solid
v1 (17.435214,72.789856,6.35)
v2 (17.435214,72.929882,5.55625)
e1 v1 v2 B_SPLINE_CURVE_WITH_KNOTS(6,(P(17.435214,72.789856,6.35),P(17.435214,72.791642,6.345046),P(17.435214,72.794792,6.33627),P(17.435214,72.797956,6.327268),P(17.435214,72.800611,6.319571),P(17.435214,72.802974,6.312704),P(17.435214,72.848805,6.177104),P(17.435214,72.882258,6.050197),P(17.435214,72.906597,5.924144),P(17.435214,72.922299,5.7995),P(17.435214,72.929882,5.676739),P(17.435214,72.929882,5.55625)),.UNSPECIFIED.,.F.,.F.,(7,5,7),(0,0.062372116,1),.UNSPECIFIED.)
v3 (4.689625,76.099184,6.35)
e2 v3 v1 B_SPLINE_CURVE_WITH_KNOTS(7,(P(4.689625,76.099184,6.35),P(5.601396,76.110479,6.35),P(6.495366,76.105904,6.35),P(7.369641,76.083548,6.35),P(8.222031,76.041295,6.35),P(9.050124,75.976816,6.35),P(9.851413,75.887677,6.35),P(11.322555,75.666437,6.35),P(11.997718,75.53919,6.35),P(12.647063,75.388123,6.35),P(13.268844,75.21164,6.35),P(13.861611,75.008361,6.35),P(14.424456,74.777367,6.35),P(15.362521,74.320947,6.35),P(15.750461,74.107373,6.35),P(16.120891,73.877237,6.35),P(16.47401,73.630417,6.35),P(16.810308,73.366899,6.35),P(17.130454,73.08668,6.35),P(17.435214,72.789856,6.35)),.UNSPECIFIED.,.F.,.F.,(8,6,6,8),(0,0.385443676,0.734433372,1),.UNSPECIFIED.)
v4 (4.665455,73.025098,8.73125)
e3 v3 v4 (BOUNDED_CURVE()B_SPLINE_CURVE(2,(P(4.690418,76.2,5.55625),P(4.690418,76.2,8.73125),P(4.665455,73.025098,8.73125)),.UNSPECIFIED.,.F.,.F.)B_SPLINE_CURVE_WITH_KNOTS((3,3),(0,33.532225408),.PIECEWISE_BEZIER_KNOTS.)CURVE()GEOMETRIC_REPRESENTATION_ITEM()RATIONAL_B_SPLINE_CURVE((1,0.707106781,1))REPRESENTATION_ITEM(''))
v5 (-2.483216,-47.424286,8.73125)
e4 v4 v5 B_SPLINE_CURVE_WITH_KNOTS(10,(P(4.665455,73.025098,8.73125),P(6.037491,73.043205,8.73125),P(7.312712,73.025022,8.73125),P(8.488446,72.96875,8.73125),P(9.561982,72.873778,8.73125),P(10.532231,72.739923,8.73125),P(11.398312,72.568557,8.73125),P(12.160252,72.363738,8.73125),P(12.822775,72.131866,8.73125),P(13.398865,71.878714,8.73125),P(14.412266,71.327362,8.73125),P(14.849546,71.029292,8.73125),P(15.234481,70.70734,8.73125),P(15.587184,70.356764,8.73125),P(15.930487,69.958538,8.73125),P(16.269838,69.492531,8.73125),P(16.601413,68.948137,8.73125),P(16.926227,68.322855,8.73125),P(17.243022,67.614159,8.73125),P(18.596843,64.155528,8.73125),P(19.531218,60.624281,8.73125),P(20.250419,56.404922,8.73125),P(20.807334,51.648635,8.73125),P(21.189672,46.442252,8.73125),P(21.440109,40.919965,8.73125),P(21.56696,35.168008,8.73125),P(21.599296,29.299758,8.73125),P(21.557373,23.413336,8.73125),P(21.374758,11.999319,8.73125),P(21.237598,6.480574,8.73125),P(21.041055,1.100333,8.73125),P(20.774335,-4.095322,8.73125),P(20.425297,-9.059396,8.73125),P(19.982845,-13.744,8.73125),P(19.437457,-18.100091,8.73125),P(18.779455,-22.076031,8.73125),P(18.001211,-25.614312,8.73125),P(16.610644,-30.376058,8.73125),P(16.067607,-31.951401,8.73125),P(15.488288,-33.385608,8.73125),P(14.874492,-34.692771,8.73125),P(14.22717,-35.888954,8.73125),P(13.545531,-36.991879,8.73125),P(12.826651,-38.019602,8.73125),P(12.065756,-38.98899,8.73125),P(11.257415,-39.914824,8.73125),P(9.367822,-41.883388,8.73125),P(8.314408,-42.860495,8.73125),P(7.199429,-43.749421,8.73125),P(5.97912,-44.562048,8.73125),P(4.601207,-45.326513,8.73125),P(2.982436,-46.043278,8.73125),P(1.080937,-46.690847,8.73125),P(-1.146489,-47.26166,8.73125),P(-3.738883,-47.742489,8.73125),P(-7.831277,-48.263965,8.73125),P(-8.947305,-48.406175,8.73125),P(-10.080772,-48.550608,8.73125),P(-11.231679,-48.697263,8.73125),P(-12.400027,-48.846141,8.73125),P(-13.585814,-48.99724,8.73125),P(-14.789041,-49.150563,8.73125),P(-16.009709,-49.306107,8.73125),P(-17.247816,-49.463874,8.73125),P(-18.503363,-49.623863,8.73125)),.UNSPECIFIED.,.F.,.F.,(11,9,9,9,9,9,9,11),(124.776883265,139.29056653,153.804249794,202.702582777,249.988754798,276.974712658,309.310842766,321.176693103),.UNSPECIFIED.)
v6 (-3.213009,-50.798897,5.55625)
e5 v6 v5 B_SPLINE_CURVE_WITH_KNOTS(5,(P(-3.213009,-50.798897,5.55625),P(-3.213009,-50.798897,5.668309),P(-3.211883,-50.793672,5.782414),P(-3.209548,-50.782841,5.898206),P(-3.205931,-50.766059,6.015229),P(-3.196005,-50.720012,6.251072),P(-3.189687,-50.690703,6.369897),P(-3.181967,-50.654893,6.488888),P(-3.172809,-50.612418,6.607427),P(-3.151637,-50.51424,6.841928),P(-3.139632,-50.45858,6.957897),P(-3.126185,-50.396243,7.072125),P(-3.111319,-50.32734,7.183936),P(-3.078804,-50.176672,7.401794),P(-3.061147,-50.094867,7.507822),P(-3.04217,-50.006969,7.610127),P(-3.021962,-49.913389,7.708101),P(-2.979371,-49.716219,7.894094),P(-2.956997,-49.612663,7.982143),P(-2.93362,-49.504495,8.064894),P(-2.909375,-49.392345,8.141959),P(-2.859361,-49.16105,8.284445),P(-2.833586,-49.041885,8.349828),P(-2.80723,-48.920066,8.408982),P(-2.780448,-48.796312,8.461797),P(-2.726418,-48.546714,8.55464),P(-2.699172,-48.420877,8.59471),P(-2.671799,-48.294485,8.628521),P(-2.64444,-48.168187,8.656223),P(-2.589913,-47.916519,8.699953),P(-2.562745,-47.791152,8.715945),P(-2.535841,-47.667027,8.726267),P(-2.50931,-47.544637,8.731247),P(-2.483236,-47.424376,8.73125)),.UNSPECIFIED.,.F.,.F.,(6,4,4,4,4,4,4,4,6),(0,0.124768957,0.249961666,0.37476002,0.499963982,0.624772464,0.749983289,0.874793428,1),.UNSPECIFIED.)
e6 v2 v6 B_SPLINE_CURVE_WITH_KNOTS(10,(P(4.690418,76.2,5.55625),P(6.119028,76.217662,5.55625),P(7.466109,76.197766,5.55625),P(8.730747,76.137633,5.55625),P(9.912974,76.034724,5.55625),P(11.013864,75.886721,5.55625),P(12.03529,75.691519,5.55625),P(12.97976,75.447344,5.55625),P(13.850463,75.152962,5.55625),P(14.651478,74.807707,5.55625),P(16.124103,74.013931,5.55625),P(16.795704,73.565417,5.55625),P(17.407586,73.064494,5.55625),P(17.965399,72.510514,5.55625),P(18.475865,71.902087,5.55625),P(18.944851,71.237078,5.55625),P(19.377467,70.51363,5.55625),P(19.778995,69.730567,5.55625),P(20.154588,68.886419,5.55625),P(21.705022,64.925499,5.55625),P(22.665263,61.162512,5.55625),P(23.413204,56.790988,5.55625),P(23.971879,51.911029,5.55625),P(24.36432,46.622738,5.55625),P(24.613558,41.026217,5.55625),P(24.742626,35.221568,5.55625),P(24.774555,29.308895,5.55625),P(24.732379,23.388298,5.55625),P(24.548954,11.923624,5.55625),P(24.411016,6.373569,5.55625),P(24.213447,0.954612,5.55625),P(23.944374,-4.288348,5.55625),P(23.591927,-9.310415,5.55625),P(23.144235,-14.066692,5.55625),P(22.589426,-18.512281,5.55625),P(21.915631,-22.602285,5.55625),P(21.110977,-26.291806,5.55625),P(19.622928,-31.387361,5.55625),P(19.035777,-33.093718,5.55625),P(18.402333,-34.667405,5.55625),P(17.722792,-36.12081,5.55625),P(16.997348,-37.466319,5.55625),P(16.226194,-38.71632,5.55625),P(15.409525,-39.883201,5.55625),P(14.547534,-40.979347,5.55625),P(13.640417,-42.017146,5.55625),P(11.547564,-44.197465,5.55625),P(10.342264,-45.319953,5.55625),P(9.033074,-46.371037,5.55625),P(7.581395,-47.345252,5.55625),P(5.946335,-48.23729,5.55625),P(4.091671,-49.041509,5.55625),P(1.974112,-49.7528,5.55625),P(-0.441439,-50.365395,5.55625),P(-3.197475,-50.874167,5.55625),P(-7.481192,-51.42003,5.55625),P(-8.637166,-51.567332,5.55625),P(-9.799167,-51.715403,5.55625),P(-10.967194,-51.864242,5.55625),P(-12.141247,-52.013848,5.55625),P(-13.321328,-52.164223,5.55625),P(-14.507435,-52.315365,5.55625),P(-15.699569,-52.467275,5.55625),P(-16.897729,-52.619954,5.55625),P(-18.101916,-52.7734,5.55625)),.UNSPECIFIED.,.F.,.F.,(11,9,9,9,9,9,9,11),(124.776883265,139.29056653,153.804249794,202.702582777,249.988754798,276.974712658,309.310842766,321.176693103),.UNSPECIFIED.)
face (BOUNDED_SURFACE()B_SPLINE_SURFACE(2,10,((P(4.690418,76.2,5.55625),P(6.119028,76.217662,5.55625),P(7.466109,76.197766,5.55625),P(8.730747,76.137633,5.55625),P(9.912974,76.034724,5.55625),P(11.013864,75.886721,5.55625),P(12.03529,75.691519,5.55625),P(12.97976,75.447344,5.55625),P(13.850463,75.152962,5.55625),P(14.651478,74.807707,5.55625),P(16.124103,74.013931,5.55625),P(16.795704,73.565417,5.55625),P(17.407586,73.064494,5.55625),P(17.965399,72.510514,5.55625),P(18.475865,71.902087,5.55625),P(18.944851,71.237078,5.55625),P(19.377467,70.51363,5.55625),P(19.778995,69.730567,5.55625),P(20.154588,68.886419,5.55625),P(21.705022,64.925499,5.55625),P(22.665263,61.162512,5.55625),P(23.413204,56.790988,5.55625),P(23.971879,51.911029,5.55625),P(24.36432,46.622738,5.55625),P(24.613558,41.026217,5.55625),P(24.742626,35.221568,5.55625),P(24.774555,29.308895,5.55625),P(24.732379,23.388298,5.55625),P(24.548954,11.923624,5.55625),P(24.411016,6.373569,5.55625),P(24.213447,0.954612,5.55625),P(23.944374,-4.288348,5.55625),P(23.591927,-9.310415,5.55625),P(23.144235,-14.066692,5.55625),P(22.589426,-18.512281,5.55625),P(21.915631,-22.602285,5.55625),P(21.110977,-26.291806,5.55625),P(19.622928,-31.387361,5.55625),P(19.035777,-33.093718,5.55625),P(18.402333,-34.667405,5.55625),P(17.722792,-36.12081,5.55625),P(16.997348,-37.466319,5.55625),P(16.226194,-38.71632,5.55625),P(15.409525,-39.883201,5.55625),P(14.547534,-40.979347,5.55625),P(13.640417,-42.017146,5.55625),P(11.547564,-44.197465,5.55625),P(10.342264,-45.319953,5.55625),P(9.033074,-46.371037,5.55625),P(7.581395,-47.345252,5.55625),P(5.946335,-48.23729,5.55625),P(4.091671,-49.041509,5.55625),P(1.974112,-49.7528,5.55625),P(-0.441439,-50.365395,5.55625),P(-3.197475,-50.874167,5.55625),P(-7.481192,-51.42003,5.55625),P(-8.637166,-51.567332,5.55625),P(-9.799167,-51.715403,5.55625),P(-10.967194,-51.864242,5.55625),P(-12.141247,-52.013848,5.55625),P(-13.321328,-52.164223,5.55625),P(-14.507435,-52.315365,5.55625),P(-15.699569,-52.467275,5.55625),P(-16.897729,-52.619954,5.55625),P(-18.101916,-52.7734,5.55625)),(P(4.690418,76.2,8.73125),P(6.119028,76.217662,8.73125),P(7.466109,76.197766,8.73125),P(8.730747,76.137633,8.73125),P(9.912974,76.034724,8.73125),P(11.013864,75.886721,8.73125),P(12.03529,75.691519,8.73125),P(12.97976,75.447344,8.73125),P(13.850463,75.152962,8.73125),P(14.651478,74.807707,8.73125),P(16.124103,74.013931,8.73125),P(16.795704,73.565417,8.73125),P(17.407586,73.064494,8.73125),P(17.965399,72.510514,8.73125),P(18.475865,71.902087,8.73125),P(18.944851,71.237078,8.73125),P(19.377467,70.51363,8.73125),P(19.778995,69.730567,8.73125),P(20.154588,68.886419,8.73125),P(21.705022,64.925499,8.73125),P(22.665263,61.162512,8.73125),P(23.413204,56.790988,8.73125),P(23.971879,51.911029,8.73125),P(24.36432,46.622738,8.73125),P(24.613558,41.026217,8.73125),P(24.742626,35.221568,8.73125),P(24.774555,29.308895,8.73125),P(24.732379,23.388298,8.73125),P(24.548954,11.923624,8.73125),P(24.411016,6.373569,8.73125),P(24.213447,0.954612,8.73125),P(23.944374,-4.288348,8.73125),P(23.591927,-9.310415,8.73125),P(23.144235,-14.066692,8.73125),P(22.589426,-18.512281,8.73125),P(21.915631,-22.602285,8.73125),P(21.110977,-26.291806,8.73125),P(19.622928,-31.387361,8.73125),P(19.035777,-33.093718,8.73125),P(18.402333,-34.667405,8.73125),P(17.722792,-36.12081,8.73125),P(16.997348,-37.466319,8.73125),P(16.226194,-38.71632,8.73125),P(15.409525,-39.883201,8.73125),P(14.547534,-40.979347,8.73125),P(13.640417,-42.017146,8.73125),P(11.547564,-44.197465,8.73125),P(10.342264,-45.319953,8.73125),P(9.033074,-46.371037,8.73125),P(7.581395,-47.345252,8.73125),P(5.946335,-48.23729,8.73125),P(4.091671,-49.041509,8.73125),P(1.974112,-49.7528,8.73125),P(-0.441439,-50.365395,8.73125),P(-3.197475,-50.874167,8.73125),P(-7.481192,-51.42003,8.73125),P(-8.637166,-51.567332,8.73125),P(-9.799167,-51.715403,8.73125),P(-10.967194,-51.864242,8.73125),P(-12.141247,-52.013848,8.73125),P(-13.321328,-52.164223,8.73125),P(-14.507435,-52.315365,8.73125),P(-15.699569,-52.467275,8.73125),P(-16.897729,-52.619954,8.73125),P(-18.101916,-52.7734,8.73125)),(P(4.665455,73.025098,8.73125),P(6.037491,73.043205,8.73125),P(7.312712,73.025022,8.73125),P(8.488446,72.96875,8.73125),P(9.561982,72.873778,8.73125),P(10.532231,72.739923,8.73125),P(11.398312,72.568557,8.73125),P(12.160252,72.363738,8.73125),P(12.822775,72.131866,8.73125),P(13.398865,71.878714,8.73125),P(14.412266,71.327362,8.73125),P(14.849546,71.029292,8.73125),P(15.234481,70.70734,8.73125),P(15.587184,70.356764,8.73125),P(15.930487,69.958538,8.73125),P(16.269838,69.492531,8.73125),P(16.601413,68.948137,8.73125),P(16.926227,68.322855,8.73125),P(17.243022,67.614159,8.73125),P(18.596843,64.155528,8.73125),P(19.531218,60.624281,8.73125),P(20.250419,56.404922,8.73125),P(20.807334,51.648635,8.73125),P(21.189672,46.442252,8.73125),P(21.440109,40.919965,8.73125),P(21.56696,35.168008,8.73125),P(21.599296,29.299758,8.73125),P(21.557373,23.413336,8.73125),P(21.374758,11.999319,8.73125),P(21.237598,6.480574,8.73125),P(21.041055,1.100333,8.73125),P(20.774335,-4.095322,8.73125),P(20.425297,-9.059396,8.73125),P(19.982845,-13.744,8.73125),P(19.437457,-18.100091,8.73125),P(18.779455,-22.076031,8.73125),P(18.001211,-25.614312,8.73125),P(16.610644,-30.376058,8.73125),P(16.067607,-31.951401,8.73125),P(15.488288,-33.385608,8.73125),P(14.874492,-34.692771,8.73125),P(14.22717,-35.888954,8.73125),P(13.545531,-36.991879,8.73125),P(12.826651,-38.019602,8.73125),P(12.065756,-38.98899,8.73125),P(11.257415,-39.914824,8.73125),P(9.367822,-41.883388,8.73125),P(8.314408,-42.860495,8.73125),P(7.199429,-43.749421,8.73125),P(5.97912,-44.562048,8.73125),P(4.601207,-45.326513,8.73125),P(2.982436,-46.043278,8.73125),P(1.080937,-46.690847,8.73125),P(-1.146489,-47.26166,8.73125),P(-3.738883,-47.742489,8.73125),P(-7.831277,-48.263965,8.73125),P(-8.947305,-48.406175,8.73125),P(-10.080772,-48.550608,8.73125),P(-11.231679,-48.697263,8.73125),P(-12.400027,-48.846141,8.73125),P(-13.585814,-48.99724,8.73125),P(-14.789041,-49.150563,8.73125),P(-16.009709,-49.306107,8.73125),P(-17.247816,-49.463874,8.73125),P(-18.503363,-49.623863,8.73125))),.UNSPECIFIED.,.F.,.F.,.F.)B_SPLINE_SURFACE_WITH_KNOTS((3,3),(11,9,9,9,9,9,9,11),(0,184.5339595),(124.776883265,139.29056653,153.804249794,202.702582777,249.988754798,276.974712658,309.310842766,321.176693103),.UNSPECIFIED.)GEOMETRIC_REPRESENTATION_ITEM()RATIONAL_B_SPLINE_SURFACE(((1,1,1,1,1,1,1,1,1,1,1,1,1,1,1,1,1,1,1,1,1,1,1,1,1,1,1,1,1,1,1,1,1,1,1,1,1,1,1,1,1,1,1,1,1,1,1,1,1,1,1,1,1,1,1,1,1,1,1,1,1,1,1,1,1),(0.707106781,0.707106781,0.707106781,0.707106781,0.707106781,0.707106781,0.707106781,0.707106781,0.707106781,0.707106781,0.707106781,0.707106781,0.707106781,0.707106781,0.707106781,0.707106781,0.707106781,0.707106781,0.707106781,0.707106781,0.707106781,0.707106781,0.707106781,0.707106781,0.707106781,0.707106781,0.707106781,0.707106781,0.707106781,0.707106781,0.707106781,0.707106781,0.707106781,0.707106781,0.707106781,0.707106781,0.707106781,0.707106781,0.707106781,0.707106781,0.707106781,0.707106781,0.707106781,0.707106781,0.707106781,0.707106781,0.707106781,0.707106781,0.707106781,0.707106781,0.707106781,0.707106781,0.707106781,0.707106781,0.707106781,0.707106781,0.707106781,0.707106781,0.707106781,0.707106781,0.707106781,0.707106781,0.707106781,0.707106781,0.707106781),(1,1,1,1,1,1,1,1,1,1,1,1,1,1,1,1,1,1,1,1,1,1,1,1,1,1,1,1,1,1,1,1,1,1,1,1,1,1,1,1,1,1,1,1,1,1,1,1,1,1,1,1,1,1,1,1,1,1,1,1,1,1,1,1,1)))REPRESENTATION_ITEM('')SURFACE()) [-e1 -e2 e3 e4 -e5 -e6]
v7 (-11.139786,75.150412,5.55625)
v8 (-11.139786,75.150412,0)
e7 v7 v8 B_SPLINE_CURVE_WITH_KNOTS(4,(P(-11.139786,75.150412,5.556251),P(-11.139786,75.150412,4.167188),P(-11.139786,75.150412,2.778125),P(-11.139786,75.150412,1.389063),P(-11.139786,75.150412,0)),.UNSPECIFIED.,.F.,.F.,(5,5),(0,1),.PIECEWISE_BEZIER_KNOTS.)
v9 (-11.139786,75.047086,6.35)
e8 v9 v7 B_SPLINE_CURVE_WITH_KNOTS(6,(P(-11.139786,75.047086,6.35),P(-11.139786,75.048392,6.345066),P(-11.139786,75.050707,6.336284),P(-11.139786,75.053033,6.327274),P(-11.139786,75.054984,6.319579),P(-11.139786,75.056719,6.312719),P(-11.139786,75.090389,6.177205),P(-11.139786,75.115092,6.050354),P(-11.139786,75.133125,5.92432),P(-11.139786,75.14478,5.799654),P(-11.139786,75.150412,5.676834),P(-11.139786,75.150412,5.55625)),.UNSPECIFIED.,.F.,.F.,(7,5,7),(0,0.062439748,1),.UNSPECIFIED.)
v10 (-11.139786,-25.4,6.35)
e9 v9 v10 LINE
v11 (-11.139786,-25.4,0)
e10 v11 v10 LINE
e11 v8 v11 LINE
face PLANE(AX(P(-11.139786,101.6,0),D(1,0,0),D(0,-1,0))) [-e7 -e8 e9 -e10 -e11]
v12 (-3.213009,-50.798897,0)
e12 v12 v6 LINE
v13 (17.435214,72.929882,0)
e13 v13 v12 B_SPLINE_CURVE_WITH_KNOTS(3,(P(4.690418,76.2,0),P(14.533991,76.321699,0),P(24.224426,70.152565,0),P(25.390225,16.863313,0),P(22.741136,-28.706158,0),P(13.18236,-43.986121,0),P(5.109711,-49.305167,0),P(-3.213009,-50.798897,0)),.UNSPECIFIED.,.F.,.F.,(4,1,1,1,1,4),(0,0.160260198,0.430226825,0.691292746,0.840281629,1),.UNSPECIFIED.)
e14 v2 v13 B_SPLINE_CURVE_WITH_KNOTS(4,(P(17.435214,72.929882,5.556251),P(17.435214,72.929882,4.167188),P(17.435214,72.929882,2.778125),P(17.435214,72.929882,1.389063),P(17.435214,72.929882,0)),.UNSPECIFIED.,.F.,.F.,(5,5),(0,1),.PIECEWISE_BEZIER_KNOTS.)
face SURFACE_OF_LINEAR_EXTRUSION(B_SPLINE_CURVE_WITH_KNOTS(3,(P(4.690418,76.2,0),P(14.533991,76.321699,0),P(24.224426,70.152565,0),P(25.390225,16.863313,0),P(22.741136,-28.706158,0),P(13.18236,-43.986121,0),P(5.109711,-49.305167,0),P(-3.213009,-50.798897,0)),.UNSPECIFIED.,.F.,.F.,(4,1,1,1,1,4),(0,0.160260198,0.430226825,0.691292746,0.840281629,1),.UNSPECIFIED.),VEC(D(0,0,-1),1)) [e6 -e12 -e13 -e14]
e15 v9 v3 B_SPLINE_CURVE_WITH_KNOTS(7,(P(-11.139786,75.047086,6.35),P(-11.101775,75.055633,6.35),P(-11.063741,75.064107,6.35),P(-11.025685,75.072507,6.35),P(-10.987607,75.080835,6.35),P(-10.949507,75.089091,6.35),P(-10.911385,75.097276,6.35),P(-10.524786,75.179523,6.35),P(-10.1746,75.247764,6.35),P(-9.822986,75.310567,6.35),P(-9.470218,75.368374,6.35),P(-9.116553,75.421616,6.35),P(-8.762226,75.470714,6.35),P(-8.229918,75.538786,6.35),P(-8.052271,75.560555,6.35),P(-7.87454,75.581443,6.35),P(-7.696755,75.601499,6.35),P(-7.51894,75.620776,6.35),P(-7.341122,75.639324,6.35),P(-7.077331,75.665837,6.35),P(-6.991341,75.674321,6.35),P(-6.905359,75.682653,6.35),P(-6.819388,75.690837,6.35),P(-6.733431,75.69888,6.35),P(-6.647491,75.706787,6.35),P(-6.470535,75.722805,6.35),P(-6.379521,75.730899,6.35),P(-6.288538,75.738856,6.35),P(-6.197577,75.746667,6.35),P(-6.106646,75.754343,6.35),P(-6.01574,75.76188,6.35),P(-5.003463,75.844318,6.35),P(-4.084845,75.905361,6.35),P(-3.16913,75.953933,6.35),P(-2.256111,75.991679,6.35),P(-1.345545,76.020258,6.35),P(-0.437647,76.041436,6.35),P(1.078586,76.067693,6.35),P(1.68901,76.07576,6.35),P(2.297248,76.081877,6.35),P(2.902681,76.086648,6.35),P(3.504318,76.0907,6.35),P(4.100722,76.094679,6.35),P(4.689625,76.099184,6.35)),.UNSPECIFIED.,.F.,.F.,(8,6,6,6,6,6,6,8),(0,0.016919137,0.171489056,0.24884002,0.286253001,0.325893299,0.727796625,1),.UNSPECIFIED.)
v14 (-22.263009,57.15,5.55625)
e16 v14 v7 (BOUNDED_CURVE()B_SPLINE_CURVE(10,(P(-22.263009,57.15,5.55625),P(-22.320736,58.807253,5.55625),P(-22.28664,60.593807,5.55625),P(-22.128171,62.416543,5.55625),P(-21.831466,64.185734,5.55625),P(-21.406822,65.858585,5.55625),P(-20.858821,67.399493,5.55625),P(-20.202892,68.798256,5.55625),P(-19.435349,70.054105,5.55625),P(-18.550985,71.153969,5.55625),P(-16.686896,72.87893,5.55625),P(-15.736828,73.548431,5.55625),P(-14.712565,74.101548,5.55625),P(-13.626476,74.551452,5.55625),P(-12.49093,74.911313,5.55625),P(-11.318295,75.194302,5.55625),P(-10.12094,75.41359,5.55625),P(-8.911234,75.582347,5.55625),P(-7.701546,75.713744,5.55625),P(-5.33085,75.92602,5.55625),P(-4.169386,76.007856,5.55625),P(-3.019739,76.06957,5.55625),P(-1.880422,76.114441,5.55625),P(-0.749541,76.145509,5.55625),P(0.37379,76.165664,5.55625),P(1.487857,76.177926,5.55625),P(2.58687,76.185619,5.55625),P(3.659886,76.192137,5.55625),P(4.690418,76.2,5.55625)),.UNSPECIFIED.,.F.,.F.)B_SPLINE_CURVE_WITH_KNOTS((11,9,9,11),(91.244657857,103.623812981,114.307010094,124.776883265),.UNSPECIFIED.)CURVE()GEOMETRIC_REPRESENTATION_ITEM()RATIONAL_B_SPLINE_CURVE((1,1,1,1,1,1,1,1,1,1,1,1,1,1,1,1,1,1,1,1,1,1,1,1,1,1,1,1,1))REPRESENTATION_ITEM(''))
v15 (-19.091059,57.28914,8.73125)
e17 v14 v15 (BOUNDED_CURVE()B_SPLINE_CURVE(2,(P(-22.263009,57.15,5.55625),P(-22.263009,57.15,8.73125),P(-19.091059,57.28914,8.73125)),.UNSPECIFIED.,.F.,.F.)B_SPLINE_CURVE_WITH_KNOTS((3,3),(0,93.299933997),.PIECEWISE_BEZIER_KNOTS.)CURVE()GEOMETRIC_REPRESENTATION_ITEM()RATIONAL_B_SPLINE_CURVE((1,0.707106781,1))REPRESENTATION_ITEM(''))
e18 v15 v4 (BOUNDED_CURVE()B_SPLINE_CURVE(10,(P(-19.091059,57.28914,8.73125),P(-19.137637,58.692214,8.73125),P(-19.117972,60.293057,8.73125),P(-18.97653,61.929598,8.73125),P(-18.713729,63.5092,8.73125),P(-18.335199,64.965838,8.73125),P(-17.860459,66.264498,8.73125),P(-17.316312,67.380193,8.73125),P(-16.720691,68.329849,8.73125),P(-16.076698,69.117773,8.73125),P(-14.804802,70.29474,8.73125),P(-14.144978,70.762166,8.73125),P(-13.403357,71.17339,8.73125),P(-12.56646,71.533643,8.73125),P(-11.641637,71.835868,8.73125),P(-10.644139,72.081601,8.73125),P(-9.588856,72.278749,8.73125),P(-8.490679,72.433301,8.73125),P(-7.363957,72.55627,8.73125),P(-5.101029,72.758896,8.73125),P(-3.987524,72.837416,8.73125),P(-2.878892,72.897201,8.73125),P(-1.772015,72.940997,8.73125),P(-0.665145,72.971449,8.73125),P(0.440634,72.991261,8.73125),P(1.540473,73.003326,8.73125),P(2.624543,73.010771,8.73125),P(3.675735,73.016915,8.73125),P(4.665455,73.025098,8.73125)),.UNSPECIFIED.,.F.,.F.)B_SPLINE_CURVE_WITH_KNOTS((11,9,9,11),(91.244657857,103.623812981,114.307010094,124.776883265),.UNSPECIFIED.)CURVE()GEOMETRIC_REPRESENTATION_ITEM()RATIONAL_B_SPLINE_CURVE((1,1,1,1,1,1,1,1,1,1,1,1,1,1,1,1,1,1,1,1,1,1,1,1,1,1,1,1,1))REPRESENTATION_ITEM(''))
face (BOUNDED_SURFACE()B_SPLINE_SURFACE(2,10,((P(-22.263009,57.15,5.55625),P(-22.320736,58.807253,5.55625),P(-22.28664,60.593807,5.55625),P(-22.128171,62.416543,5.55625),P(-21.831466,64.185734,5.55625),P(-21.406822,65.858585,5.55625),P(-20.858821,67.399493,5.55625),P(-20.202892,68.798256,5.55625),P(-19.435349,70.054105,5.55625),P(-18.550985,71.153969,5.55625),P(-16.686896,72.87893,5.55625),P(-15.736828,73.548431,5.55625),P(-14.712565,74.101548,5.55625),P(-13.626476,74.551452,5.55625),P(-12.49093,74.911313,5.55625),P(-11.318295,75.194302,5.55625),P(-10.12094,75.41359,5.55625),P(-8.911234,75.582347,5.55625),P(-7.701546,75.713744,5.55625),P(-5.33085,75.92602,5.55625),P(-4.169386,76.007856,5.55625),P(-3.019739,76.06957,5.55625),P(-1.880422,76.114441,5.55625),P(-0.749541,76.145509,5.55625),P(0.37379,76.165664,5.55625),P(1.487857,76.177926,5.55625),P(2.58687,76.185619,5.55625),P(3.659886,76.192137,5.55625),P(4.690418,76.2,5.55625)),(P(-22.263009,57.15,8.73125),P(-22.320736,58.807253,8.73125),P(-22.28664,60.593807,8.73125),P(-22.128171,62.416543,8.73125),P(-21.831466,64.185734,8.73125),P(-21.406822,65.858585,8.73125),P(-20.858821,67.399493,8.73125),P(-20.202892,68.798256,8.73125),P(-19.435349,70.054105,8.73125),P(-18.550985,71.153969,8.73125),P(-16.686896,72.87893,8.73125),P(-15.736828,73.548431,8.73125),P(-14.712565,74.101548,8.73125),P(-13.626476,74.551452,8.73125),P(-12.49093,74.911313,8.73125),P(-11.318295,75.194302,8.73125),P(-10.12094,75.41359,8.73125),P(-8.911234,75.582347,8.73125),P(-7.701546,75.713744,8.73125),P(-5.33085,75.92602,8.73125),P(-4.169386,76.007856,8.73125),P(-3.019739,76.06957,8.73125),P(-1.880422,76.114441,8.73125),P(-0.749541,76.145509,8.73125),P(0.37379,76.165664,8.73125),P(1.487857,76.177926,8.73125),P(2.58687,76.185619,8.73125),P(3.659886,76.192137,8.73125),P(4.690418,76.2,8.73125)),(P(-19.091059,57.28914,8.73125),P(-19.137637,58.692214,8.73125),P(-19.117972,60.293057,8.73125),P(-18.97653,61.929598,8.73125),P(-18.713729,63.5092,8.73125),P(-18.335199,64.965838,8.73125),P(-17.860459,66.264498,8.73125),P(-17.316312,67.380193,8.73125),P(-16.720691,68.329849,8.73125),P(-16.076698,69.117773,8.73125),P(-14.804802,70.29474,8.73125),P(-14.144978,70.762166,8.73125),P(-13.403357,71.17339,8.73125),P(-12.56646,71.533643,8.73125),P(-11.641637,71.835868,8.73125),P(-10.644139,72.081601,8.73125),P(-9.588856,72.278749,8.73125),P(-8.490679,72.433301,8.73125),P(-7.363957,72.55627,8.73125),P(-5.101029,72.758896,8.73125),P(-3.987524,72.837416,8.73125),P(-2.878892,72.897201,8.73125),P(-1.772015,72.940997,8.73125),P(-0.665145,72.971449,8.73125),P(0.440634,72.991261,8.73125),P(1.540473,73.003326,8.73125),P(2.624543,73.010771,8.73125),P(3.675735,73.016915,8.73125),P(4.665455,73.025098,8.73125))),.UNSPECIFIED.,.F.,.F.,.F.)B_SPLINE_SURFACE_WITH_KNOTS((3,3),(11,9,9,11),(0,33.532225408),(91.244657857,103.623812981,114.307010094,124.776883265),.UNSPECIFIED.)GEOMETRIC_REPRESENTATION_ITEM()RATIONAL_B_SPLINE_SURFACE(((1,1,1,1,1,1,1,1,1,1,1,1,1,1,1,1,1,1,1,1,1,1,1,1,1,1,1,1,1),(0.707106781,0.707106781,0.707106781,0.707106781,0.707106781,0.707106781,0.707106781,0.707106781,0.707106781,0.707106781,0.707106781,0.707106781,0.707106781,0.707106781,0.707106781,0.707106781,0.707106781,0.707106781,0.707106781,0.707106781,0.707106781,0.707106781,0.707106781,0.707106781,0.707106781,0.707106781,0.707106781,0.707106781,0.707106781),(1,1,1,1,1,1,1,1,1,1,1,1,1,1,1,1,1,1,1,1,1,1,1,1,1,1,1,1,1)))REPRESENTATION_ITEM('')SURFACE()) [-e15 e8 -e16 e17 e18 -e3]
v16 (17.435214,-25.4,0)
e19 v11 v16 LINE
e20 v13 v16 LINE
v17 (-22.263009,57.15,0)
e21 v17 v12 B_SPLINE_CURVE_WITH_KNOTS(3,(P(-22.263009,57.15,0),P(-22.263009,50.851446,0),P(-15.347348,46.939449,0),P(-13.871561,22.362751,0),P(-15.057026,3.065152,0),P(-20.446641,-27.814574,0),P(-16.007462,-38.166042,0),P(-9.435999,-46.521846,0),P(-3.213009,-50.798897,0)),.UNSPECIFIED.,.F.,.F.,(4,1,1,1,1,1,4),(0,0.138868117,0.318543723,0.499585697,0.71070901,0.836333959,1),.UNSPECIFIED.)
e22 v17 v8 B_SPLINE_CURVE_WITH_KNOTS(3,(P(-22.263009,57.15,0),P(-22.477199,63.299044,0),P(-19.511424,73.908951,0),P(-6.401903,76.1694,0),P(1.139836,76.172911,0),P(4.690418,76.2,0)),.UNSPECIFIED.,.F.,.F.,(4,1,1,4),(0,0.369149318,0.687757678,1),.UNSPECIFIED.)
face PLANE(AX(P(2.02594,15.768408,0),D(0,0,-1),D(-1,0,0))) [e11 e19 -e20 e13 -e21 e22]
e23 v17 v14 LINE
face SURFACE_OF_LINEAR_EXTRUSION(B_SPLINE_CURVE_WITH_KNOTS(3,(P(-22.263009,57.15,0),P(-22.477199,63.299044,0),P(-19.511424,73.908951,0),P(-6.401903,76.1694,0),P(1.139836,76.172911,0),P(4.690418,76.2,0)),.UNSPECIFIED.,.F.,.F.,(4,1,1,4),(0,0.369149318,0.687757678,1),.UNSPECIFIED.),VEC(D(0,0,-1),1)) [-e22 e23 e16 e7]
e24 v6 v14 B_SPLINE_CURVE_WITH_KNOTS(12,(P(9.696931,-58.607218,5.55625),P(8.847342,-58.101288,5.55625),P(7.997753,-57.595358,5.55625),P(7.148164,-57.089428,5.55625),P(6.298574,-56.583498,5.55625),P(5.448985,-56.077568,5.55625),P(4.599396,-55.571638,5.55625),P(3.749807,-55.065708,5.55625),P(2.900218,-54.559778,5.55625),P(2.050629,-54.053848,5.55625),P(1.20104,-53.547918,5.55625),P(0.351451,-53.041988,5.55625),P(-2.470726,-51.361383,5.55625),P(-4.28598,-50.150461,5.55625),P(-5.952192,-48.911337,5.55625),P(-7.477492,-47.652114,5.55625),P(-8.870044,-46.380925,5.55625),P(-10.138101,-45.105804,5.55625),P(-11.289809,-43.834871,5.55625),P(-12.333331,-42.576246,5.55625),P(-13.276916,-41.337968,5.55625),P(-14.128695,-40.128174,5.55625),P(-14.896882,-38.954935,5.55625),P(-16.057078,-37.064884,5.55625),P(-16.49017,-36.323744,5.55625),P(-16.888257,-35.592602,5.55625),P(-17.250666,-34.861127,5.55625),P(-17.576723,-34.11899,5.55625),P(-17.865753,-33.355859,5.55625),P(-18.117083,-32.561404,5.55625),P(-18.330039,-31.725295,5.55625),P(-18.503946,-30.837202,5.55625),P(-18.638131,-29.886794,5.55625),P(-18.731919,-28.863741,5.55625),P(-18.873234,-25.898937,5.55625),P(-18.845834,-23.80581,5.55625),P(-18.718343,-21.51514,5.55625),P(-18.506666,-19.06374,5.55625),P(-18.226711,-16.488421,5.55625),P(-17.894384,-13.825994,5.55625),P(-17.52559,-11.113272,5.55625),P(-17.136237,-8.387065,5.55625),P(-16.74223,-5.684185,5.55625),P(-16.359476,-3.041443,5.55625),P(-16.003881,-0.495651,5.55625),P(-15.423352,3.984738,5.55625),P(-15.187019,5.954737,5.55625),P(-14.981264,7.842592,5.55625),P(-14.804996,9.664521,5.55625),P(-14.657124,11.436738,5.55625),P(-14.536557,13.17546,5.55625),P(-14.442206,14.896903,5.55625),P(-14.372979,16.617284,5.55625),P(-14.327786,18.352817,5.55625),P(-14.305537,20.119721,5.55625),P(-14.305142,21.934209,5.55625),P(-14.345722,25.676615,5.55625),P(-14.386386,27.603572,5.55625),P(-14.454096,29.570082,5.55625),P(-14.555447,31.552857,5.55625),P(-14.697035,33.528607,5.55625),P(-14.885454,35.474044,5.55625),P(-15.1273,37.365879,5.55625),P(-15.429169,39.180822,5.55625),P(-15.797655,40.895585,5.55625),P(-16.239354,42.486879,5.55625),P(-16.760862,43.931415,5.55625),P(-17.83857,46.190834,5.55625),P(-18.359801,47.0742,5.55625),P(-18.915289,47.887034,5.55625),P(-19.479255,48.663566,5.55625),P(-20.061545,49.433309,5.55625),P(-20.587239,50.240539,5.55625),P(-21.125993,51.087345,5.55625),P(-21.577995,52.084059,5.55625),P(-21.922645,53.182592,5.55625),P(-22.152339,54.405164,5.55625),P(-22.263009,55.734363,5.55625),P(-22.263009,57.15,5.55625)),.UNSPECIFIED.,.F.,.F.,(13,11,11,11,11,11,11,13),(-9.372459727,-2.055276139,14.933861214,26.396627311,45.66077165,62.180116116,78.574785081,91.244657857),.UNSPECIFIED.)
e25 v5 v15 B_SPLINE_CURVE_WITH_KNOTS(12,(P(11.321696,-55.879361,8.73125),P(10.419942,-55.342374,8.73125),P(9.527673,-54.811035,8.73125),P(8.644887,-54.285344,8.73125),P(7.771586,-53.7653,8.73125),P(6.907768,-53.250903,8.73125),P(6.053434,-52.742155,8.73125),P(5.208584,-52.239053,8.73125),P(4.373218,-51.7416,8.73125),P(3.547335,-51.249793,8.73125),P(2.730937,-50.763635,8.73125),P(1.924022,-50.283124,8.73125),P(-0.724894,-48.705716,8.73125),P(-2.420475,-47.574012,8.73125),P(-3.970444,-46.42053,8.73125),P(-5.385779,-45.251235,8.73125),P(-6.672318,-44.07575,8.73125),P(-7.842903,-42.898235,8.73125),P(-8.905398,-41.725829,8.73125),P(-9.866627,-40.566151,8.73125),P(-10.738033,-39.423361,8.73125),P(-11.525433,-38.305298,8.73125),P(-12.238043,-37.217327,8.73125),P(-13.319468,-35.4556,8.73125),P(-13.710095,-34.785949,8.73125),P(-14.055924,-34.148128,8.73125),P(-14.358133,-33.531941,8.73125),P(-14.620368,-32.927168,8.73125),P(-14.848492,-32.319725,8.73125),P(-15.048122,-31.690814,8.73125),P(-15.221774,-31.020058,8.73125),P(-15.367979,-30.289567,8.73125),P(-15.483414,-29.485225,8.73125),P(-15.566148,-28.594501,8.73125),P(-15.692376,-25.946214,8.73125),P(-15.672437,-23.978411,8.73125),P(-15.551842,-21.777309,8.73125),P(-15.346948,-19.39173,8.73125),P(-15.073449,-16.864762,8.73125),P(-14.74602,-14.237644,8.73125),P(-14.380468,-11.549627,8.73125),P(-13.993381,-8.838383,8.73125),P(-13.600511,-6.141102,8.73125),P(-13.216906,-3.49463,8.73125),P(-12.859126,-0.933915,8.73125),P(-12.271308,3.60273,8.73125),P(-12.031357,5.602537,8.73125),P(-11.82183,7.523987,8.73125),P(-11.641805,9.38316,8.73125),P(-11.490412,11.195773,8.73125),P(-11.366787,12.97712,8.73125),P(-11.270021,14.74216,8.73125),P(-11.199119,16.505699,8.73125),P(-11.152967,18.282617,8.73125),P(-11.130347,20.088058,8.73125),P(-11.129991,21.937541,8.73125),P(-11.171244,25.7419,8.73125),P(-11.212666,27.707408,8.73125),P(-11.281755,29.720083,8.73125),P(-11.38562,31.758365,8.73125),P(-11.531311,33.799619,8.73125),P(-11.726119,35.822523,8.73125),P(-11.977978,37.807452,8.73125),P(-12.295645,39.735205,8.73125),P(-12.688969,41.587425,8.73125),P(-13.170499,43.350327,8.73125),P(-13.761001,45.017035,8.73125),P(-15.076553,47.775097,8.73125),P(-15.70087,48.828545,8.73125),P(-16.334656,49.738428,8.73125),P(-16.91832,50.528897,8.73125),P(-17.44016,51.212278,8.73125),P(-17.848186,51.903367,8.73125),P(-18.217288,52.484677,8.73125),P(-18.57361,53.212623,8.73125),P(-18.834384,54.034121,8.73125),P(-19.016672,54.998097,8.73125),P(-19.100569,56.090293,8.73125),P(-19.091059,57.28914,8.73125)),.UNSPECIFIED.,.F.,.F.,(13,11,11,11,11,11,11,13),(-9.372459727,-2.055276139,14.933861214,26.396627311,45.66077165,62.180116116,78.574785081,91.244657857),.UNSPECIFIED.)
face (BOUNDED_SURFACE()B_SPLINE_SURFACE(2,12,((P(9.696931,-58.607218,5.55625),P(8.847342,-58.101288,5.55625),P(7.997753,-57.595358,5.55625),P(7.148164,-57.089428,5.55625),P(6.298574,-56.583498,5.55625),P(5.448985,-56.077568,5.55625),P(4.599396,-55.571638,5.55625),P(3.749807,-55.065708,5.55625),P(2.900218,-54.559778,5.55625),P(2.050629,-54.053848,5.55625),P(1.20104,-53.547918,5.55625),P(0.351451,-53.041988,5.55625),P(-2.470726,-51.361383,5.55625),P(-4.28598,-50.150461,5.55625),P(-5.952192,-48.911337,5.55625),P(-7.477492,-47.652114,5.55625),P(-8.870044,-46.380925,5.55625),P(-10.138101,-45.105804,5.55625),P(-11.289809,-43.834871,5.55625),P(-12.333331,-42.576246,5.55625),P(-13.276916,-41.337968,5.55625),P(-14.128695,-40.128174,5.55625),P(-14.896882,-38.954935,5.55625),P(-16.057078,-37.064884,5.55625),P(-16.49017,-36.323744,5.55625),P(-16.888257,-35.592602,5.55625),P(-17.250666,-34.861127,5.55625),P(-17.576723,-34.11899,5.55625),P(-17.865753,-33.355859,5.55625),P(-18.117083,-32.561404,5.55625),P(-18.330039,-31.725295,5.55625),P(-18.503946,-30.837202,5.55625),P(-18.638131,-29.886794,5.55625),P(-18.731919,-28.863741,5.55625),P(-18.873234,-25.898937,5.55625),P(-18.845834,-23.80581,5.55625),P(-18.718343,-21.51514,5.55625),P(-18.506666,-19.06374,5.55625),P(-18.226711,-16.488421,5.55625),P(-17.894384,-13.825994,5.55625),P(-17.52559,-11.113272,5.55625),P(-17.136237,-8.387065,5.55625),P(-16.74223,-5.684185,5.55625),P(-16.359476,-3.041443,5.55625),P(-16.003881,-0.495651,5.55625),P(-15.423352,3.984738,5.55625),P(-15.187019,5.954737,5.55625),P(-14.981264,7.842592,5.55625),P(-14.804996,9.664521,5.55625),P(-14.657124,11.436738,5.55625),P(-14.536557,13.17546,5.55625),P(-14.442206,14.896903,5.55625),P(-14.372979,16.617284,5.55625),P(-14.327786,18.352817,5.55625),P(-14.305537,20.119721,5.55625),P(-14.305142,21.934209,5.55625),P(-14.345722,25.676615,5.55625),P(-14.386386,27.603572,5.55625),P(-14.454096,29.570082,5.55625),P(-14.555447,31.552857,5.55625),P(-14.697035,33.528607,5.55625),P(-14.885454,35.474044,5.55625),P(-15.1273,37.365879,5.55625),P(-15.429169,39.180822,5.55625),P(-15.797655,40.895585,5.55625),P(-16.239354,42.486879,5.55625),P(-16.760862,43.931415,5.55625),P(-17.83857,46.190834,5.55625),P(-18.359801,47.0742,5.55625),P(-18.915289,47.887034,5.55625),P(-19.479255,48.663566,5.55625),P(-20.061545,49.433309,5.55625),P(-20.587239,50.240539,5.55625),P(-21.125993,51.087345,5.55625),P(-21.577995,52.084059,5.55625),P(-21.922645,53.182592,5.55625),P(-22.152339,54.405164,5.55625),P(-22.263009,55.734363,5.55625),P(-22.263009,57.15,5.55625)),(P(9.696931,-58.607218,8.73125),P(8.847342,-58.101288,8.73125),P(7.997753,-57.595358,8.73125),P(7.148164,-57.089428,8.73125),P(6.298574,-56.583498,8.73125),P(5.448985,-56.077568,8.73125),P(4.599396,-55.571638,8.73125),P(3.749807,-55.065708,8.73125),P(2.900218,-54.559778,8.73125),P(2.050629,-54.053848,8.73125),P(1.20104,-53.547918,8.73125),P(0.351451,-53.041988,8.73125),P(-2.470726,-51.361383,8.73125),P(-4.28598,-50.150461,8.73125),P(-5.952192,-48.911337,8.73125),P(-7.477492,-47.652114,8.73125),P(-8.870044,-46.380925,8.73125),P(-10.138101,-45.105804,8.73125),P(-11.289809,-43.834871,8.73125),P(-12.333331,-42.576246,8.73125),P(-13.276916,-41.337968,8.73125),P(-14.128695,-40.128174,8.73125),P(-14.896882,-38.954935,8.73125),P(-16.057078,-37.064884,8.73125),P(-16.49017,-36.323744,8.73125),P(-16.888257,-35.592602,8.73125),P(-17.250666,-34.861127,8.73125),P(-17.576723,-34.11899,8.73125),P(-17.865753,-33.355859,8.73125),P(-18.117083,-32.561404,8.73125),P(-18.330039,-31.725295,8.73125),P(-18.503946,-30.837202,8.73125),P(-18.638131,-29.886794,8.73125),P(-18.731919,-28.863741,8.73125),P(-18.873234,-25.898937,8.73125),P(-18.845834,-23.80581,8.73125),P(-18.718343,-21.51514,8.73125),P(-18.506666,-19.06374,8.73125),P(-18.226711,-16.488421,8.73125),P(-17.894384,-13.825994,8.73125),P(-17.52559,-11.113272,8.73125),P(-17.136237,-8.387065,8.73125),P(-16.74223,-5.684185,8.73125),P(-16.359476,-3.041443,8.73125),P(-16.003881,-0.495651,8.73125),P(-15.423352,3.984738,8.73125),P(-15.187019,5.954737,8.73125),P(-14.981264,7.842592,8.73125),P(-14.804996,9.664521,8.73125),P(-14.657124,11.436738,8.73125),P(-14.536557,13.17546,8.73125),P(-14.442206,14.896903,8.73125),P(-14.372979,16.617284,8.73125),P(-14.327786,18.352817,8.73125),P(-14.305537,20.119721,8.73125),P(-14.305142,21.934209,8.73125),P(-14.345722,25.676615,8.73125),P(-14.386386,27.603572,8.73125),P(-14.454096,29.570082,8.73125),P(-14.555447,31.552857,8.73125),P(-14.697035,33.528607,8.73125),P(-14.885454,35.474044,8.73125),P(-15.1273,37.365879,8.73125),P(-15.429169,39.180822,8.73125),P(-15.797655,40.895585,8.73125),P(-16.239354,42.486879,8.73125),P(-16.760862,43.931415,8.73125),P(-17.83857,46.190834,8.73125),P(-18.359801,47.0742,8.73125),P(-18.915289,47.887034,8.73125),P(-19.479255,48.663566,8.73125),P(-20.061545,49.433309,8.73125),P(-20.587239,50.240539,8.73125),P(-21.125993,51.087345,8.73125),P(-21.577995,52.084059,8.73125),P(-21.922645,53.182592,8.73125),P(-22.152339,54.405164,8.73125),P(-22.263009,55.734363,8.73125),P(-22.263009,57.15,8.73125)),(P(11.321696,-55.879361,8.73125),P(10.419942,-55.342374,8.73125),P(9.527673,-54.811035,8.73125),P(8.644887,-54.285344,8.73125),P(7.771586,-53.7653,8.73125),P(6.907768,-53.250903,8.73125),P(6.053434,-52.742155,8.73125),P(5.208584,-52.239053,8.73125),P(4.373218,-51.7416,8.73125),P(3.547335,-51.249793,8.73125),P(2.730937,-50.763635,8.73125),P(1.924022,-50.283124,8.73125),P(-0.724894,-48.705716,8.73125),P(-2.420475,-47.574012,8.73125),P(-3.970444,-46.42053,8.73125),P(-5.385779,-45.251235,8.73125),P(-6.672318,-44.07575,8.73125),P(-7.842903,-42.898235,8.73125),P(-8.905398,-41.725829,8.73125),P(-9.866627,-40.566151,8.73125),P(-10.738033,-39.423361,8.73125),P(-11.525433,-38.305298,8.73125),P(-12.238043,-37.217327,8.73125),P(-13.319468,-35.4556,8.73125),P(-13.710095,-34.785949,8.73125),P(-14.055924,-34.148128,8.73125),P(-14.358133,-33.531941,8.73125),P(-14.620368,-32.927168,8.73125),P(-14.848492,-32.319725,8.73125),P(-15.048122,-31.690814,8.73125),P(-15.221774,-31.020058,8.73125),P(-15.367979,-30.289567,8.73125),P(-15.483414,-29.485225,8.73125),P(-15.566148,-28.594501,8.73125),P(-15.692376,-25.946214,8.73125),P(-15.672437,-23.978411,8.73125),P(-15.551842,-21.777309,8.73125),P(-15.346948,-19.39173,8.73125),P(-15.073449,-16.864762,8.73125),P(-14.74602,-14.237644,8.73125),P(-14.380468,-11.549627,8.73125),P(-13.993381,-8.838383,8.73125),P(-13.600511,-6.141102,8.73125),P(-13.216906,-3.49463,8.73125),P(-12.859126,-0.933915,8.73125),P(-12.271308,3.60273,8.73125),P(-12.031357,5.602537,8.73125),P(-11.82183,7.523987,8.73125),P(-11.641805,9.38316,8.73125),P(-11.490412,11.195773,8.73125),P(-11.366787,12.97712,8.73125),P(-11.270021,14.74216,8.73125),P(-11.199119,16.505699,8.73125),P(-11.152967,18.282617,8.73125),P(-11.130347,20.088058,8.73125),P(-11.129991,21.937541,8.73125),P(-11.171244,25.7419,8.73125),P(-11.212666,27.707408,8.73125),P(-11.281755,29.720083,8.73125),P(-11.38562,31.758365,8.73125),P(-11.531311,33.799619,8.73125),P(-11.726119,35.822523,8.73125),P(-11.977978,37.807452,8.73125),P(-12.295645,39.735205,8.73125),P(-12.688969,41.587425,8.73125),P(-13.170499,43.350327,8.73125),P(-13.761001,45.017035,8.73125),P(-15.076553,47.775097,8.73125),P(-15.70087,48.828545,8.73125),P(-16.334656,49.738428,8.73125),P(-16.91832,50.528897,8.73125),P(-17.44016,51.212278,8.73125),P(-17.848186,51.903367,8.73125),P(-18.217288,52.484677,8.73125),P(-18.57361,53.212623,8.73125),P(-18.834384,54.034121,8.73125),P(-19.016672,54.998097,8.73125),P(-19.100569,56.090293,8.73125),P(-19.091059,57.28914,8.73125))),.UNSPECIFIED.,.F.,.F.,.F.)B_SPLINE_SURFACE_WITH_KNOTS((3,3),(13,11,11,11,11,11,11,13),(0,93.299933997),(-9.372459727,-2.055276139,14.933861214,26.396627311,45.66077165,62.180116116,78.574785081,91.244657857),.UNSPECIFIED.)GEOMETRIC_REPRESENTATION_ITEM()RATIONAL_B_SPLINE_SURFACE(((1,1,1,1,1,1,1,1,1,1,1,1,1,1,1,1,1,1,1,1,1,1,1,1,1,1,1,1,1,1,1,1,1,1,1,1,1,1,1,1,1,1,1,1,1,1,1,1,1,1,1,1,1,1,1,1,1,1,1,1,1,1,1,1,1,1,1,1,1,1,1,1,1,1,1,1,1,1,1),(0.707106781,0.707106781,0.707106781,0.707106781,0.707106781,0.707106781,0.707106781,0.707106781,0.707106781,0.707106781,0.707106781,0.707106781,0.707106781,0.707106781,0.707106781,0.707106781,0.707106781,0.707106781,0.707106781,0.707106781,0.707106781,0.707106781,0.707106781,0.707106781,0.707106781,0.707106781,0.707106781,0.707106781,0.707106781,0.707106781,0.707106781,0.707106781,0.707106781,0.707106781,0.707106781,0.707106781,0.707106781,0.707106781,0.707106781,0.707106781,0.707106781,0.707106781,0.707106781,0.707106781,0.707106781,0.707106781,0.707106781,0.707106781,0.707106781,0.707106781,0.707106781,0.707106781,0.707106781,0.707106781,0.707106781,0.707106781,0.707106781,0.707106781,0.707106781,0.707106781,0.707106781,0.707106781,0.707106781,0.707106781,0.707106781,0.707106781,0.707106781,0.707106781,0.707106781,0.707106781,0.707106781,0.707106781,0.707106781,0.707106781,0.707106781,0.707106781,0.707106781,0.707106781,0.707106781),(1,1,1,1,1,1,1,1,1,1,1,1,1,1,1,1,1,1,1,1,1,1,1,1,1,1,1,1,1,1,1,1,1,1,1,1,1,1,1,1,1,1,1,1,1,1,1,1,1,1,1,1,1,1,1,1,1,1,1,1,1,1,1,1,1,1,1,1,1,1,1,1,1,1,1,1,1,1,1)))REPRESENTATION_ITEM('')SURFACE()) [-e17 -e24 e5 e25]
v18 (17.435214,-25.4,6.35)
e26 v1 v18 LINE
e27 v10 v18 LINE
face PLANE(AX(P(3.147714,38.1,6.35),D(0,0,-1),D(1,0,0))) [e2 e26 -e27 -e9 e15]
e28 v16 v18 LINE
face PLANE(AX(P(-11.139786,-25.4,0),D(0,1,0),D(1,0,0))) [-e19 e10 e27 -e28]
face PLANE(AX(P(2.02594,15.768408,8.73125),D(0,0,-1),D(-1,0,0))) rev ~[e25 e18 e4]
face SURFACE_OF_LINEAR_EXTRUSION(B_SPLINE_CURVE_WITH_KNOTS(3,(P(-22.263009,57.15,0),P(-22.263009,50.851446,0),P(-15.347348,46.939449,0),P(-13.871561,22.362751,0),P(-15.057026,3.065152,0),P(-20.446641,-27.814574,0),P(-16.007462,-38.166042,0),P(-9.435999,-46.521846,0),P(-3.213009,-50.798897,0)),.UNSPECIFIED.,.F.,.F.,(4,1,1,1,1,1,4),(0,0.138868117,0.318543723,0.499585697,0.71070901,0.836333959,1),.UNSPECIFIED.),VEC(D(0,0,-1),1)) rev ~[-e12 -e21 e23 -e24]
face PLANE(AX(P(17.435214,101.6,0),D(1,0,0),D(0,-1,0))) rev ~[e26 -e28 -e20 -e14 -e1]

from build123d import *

# Parameters (mm, degrees)
F1_DEPTH = 8.73125
F2_R     = 3.175
F3_W     = 28.575
F3_H     = 127
F4_DEPTH = 6.35


with BuildPart() as f1:
    # F0 (on Top) → F1 (new body)
    with BuildSketch(Plane.XY):
        with BuildLine():
            add(Edge.make_bspline(
                [(-22.2630089622, 57.15), (-22.4771988152, 63.2990440352), (-19.5114240111, 73.9089506041), (-6.4019025255, 76.1693999245), (1.1398358038, 76.1729106307), (4.6904176342, 76.2)],
                knots=[0, 0, 0, 0, 0.3691493182, 0.6877576776, 1, 1, 1, 1], degree=3))
            add(Edge.make_bspline(
                [(-22.2630089622, 57.15), (-22.2630089622, 50.8514460964), (-15.3473480842, 46.9394491864), (-13.8715606343, 22.3627512215), (-15.0570255507, 3.0651518011), (-20.4466410587, -27.8145738651), (-16.0074621044, -38.1660419017), (-9.4359992072, -46.521846205), (-3.2130089622, -50.7988970175)],
                knots=[0, 0, 0, 0, 0.138868117, 0.3185437234, 0.4995856975, 0.7107090098, 0.8363339586, 1, 1, 1, 1], degree=3))
            add(Edge.make_bspline(
                [(4.6904176342, 76.2), (14.5339909941, 76.3216987252), (24.2244258774, 70.1525650219), (25.3902250152, 16.8633127605), (22.7411357456, -28.7061581774), (13.1823598211, -43.9861209726), (5.1097106189, -49.3051670492), (-3.2130089622, -50.7988970175)],
                knots=[0, 0, 0, 0, 0.1602601979, 0.4302268246, 0.6912927459, 0.8402816289, 1, 1, 1, 1], degree=3))
        make_face()
    extrude(amount=F1_DEPTH)

    # F2
    f2_edges = [f1.edges().sort_by_distance(p)[0] for p in [
        (-14.65314, 73.993268, 8.73125),
        (24.530161, 12.135146, 8.73125),
        (-15.806546, 1.03866, 8.73125),
    ]]
    fillet(f2_edges, radius=F2_R)

    # F3 (on face) → F4 (cut)
    with BuildSketch(Plane(origin=(0, 0, 0), x_dir=(1, 0, 0), z_dir=(0, 0, -1))):
        with Locations((3.1477137653, -38.1)):
            Rectangle(F3_W, F3_H)
    extrude(amount=-F4_DEPTH, mode=Mode.SUBTRACT)


solid = f1.part
